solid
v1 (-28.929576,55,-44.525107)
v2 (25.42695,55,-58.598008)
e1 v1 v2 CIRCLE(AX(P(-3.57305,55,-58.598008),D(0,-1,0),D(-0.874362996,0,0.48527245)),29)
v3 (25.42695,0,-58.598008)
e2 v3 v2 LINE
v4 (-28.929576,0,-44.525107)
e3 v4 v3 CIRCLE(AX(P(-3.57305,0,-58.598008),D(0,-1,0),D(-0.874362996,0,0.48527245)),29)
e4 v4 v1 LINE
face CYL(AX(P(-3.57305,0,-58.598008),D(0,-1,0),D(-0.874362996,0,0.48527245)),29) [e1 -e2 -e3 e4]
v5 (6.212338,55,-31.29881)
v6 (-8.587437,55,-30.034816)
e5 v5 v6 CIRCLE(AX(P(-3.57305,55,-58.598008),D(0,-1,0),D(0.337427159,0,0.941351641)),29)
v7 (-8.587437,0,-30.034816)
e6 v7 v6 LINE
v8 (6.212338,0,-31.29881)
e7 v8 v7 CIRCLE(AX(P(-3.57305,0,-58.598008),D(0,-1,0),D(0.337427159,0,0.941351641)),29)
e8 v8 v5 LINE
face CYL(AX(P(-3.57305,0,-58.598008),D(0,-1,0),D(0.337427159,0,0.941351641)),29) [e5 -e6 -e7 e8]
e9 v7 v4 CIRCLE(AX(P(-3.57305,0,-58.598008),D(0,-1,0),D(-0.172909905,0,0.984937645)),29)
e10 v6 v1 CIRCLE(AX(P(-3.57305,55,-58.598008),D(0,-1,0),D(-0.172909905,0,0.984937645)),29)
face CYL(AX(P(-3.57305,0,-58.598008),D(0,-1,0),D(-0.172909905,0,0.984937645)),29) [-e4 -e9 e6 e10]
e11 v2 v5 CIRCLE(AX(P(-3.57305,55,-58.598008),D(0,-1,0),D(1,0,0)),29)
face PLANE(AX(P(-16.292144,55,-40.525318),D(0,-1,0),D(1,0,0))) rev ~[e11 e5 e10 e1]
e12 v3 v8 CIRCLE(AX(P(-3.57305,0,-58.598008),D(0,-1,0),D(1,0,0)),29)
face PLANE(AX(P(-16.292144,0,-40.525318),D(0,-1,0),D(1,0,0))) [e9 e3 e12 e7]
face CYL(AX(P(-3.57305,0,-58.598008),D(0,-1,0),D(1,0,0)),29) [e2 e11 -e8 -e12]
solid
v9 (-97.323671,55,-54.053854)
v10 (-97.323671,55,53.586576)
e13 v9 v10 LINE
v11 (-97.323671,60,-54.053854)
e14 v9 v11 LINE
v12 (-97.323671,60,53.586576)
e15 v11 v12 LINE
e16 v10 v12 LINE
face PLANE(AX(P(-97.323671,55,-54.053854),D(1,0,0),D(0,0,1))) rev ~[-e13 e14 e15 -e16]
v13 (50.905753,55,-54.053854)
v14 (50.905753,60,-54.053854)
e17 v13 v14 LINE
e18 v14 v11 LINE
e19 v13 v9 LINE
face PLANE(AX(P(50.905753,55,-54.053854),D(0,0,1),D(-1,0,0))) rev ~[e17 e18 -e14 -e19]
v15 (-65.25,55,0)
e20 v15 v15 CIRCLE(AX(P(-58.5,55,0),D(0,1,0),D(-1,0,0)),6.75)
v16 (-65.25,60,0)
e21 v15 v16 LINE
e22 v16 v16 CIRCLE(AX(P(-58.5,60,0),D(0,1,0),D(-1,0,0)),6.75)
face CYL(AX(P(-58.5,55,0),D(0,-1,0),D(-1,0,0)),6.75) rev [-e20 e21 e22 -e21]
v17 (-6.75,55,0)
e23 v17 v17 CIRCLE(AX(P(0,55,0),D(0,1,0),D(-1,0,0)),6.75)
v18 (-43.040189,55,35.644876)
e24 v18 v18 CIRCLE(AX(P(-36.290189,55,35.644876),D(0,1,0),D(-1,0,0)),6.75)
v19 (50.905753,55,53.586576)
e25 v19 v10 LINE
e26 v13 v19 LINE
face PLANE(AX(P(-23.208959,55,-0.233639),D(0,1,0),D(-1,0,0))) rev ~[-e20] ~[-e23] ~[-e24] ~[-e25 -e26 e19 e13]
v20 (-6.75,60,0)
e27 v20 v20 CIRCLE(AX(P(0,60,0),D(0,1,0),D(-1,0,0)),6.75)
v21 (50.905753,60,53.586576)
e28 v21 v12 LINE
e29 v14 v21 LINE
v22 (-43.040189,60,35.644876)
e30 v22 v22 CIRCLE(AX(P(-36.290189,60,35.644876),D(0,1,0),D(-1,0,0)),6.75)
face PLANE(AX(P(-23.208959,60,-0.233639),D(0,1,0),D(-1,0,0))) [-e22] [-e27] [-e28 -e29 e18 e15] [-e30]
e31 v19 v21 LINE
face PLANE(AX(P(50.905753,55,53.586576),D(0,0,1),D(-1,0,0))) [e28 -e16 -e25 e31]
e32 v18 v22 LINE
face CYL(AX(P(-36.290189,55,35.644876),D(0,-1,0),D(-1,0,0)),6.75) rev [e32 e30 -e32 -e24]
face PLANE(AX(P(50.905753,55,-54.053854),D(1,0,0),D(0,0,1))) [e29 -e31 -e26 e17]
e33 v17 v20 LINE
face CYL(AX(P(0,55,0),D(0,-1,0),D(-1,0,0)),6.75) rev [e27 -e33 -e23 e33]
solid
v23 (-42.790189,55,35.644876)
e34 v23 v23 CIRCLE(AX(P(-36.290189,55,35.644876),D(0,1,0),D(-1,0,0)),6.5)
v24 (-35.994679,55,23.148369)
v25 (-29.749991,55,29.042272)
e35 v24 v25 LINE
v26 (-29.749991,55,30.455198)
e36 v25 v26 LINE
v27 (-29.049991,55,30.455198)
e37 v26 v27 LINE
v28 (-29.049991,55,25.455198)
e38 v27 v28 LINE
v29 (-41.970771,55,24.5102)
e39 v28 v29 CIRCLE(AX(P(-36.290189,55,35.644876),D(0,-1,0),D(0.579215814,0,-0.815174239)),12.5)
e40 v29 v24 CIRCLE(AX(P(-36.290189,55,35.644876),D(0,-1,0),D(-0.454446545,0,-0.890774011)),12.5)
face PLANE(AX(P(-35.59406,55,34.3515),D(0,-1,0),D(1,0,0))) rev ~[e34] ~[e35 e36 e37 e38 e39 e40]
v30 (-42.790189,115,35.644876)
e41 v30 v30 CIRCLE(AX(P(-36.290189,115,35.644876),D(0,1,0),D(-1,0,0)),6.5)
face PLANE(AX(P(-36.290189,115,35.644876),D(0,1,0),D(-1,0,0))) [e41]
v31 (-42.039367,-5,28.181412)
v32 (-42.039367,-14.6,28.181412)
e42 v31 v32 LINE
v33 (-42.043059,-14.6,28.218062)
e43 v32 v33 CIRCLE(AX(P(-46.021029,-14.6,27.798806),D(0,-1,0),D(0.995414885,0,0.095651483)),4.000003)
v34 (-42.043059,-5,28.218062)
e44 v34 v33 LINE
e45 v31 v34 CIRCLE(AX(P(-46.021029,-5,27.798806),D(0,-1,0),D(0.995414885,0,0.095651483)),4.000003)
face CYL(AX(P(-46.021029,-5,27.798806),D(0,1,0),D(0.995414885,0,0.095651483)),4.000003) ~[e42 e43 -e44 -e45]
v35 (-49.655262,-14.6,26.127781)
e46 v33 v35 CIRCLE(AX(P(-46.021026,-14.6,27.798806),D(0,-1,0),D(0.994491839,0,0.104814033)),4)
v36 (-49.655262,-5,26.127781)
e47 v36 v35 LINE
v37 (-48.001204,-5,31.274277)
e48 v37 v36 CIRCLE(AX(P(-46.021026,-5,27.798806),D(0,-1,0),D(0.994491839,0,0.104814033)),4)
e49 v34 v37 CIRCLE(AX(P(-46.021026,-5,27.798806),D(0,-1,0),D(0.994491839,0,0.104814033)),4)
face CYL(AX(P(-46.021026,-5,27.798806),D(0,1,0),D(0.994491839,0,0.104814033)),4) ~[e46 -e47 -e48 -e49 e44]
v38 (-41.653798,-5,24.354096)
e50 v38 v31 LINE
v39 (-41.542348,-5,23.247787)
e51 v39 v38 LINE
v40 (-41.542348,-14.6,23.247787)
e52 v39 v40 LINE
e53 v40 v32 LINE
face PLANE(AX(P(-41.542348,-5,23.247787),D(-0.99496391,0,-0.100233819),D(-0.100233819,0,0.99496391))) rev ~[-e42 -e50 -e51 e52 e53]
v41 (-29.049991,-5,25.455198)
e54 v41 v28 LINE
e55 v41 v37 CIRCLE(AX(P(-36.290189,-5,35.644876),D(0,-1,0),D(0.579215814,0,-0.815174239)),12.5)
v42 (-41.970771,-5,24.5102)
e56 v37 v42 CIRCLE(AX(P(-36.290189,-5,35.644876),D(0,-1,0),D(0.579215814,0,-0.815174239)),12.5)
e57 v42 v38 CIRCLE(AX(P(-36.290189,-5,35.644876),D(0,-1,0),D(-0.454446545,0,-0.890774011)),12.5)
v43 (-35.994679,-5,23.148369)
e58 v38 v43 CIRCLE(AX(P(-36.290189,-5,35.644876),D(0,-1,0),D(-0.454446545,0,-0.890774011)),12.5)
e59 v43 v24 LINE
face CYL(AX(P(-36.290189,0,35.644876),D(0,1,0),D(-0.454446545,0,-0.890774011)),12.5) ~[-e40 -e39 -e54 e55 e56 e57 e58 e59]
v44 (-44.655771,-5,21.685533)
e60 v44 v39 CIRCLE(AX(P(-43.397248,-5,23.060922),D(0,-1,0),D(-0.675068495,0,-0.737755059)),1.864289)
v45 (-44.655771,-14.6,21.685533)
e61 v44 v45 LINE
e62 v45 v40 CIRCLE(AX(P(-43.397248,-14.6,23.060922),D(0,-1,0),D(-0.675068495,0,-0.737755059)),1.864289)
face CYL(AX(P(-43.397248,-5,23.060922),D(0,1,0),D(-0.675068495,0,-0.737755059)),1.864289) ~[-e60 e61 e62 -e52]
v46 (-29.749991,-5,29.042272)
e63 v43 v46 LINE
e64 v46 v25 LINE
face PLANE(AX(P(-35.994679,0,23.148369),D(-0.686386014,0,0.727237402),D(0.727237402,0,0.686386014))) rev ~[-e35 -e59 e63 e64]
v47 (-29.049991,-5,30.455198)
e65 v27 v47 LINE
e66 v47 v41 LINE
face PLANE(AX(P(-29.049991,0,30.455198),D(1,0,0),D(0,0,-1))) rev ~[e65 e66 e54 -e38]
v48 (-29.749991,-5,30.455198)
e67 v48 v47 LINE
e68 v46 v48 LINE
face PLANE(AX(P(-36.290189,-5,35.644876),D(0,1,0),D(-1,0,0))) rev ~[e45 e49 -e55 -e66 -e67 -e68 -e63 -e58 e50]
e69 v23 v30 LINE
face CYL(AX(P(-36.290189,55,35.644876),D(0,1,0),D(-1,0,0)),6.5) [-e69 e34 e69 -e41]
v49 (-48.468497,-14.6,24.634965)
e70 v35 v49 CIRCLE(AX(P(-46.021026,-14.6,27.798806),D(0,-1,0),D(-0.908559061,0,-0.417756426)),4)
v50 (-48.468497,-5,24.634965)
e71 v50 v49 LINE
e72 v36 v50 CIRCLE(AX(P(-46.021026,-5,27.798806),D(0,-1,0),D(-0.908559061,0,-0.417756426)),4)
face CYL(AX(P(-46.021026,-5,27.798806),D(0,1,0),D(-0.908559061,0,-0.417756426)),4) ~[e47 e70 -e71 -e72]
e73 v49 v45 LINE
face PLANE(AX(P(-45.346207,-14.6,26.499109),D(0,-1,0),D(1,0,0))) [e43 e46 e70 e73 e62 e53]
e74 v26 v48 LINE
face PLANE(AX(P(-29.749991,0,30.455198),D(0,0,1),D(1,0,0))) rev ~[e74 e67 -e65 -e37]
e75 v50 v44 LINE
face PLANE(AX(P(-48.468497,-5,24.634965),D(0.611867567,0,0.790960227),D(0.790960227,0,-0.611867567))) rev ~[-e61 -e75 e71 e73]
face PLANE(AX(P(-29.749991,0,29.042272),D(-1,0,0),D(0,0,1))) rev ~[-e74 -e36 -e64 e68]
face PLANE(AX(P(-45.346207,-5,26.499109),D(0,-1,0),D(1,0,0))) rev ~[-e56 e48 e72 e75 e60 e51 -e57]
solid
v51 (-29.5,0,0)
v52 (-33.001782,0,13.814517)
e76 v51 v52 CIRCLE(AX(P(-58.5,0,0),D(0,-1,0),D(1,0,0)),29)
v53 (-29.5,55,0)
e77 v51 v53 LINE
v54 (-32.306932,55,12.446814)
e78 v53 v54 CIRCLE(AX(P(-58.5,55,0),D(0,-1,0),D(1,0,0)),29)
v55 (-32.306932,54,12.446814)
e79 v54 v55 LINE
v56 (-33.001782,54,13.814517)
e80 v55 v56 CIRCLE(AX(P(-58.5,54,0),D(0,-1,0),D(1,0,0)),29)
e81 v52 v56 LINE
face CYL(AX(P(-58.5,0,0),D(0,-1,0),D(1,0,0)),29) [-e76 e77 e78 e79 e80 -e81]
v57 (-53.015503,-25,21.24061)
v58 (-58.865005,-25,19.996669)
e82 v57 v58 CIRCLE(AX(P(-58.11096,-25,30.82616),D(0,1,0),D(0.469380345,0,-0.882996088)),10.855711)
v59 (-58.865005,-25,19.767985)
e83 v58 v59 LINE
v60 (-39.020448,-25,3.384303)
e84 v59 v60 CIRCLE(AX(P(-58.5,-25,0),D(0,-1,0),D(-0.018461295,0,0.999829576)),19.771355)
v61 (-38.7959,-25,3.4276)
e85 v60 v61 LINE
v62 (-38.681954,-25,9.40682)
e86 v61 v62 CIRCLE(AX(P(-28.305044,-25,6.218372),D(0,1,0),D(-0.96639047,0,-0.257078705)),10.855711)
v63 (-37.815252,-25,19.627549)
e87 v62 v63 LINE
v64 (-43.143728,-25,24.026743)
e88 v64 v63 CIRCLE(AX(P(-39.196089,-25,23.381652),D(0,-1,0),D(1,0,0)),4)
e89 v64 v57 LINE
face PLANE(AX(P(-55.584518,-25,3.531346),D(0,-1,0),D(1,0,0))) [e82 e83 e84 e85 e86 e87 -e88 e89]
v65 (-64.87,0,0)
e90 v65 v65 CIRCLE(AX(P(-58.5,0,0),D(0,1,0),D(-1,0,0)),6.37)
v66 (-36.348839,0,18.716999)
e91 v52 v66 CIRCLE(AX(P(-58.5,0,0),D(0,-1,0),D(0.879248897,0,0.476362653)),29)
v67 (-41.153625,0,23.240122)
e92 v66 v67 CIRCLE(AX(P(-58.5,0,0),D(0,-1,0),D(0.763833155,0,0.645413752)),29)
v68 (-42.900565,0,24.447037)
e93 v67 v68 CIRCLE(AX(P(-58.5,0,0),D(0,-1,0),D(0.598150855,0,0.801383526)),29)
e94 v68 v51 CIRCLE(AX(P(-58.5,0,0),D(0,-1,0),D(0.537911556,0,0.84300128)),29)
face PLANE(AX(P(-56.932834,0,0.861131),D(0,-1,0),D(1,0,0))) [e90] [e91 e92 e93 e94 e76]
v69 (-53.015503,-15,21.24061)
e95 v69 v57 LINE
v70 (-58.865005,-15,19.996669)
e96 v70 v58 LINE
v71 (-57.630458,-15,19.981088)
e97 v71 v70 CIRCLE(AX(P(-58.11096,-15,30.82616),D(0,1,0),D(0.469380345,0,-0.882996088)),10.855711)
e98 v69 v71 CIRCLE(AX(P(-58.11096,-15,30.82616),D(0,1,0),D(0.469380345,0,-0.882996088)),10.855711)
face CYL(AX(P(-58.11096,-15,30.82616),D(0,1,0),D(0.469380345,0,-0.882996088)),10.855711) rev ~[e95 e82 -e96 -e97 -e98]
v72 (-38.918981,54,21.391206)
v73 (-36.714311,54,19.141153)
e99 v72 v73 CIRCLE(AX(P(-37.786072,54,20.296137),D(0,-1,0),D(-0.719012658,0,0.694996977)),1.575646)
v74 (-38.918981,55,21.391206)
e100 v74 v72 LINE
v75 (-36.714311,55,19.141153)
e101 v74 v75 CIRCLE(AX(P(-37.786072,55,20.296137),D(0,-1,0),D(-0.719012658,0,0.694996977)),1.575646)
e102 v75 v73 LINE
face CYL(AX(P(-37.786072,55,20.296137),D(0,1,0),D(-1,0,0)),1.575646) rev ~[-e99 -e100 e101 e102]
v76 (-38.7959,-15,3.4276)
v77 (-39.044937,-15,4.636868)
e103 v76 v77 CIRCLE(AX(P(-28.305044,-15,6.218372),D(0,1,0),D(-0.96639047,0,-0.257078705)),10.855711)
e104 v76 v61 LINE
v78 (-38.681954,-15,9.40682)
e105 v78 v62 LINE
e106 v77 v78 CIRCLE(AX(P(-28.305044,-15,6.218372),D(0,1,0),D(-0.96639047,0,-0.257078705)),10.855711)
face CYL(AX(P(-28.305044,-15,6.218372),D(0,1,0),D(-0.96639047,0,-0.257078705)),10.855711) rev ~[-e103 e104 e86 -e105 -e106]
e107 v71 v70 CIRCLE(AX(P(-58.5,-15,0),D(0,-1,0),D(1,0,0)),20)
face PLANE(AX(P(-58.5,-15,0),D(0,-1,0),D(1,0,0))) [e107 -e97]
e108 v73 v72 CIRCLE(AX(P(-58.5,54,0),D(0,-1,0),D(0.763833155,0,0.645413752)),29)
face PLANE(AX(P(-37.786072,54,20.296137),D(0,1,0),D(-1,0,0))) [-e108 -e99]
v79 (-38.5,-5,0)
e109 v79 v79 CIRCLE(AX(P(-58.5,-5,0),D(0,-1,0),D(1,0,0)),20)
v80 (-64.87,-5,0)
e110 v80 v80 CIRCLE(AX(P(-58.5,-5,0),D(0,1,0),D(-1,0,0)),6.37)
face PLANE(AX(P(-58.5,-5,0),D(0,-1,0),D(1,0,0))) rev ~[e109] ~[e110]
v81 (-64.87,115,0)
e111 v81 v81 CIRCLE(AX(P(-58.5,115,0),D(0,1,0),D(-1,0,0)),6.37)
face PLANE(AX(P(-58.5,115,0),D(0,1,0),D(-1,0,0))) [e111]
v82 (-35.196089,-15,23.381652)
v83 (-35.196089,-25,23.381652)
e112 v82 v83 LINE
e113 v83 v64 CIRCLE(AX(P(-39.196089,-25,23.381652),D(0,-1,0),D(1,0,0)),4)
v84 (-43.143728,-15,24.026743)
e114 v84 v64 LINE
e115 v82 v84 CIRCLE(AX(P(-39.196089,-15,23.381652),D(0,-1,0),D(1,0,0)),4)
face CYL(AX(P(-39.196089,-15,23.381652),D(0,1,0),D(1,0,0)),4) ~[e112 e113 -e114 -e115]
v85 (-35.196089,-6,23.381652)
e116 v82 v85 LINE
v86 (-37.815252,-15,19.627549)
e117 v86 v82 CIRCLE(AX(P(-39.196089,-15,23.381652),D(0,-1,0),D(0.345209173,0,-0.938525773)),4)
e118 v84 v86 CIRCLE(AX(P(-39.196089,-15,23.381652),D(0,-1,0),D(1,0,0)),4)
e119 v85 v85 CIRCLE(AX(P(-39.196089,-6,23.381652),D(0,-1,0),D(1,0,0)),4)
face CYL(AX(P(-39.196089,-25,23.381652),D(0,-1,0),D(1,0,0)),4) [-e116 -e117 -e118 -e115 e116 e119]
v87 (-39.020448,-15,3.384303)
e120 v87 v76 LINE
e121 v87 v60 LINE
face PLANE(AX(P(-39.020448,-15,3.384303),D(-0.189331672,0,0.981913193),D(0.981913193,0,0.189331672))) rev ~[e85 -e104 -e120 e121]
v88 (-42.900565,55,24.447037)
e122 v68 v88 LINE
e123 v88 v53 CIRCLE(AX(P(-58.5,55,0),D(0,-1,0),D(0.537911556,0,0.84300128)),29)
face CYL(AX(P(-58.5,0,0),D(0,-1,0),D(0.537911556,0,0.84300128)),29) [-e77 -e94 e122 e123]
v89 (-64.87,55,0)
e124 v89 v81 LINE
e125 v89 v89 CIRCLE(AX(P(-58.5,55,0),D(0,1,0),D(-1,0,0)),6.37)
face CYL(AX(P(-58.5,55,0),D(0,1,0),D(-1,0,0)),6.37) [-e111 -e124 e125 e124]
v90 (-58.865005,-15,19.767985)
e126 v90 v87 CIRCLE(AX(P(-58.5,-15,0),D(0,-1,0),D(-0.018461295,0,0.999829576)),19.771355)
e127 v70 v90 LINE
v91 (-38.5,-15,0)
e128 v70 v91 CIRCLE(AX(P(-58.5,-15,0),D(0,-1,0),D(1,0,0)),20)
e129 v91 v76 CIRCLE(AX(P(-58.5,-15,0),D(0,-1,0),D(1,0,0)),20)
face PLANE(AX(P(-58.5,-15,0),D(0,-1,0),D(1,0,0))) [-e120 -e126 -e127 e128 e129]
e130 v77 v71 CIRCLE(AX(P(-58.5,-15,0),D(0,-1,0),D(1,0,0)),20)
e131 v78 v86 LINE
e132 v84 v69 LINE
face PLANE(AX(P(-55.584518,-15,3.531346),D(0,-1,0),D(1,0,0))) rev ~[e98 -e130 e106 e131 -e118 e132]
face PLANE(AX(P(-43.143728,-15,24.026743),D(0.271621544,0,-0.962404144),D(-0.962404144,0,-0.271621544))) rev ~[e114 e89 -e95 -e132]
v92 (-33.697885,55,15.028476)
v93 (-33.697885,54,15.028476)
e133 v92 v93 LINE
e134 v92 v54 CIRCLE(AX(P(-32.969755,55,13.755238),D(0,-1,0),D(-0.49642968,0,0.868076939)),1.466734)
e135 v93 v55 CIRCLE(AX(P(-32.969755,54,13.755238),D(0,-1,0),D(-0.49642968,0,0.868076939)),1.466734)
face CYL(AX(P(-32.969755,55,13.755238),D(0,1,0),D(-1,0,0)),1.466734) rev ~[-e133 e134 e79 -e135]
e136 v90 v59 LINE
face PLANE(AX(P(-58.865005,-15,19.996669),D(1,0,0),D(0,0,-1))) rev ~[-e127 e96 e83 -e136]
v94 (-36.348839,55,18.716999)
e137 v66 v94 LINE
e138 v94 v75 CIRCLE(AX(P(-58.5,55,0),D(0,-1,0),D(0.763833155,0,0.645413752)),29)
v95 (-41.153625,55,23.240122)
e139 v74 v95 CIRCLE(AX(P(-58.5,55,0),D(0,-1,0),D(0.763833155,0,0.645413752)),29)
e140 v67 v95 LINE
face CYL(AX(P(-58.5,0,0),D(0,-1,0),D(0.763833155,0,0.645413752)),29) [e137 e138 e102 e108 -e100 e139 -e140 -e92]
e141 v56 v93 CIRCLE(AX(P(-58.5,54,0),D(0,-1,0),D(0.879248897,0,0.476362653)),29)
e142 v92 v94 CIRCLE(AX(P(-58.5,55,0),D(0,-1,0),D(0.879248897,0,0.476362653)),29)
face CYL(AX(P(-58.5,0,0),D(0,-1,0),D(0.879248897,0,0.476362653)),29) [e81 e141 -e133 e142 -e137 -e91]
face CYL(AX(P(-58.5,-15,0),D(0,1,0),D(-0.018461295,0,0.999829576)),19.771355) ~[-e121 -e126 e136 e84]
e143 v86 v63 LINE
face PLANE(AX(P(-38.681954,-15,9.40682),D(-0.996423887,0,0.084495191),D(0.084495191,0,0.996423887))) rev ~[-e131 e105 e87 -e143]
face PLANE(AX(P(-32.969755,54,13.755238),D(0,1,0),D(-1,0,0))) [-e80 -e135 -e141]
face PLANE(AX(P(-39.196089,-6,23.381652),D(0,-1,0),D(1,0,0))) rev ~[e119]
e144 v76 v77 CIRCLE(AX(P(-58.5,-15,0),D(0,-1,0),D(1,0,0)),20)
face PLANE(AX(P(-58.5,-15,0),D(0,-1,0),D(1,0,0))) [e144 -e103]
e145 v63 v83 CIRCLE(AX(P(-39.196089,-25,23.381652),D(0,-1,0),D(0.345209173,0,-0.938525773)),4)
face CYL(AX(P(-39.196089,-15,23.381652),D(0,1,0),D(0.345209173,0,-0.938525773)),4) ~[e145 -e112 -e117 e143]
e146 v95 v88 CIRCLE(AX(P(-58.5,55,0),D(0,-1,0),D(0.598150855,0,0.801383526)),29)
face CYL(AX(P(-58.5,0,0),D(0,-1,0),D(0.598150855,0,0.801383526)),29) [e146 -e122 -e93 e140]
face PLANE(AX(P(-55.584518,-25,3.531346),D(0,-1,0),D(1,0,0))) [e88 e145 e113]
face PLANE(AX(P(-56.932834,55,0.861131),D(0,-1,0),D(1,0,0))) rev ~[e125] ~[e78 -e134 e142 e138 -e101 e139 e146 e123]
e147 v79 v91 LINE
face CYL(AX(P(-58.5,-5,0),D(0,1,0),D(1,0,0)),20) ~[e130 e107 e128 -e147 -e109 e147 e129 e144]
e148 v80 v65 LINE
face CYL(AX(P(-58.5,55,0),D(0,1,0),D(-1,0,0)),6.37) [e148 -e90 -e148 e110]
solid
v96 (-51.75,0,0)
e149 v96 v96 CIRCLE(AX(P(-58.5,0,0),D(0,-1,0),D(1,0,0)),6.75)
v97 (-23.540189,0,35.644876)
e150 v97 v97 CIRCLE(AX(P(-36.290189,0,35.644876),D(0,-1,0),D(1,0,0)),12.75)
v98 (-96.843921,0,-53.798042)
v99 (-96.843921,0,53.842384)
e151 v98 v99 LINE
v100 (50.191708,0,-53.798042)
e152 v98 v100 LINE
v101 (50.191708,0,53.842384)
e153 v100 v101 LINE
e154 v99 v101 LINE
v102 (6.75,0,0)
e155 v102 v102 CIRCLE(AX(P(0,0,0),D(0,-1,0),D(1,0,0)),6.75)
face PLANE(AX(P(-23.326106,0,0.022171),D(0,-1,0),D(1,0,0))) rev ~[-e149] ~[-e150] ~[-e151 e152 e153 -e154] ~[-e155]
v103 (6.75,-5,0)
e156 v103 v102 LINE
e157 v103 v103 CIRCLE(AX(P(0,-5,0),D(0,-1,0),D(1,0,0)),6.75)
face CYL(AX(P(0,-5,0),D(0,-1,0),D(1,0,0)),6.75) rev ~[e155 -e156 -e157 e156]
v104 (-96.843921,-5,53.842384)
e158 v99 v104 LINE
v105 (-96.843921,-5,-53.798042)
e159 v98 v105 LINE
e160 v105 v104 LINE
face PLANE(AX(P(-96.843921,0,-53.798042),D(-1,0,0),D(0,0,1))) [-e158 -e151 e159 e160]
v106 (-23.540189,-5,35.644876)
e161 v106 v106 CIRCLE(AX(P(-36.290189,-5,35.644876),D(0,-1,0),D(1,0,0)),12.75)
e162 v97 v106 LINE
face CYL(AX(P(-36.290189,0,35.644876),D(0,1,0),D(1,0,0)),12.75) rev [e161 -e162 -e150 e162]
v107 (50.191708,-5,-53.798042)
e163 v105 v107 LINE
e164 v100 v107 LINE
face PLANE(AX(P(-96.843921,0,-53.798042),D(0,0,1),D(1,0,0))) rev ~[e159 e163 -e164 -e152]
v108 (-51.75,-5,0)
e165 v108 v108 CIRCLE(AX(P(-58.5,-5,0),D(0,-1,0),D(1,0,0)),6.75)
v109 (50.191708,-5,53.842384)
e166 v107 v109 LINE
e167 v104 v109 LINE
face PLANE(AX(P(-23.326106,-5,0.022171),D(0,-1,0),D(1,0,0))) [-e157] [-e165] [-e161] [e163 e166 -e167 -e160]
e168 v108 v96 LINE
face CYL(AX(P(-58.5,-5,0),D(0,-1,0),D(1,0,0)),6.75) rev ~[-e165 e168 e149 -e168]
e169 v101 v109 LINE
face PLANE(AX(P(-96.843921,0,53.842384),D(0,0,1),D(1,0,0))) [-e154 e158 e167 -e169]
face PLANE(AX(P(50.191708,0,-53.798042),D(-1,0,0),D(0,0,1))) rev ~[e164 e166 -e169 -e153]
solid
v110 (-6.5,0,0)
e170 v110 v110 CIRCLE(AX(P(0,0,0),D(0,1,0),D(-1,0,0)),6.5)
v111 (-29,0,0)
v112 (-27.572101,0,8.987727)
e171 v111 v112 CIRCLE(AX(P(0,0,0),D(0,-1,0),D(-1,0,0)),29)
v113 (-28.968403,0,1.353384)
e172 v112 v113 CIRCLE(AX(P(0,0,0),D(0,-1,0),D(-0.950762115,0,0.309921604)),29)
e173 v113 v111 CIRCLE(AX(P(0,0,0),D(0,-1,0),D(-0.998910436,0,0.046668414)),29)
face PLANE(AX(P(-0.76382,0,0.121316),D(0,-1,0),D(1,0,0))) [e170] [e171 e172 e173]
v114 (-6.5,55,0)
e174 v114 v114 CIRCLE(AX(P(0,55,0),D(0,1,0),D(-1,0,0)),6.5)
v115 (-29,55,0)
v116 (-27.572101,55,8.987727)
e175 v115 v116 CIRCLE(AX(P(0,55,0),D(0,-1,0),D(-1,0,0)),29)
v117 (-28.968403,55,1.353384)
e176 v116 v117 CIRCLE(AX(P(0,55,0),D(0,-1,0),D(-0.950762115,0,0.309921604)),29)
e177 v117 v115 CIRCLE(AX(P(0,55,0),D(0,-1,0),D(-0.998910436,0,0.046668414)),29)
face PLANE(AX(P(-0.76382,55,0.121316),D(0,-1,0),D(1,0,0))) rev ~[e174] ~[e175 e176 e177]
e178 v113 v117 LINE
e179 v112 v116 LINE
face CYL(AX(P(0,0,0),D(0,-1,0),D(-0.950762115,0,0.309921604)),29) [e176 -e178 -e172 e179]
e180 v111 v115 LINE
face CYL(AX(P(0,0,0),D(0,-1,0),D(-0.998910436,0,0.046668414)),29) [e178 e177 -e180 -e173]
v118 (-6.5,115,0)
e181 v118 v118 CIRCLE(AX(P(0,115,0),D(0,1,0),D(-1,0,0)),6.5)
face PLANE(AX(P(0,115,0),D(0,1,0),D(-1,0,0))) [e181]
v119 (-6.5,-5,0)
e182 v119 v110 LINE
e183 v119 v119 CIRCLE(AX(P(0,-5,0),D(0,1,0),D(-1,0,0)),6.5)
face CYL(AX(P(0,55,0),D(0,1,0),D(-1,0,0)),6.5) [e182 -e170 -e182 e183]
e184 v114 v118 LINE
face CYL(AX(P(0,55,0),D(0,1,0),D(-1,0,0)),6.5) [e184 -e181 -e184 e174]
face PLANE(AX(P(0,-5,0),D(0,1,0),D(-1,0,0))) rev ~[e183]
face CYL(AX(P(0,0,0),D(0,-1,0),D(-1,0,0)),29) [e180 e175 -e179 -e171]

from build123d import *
from build123d import SkipClean  # not in build123d's __all__

# Parameters (mm, degrees)
F1_DEPTH  = 55
F2_DEPTH  = 55
F3_DEPTH  = 5
F4_W      = 147.0356285572
F4_H      = 107.6404266059
F4_R      = 12.75
F5_DEPTH  = 5
F6_R      = 6.5
F7_DEPTH  = 60
F6_R_2    = 6.37
F8_R      = 6.75
F8_R_2    = 6.5
F9_DEPTH  = 5
F10_W     = 148.2294239104
F10_H     = 107.6404303312
F10_R     = 29
F10_R_2   = 6.75
F11_DEPTH = 5
F12_R     = 20
F13_DEPTH = 10
F15_DEPTH = 9.6
F16_R     = 1.4667338037
F16_R_2   = 1.575645526
F17_DEPTH = 1
F19_DEPTH = 10
F20_R     = 4
F21_DEPTH = 19


# Not quite as in the source:
# - a feature names something its author has since deleted; it is built from what else it names


with BuildPart() as f1:
    # F0 (on Front) → F1 (new body)
    with BuildSketch(Plane.XZ):
        with BuildLine():
            ThreePointArc((-41.1536252148, 23.2401222417), (-42.0160454202, 23.8595733703), (-42.9005648719, 24.4470371146))
            ThreePointArc((-42.9005648719, 24.4470371146), (-83.9301358502, -13.9394472861), (-29.5, 0))
            ThreePointArc((-29.5, 0), (-30.3890739875, 7.1257167163), (-33.0017819808, 13.8145169241))
            ThreePointArc((-33.0017819808, 13.8145169241), (-34.5495422962, 16.3516230319), (-36.348838503, 18.7169988068))
            ThreePointArc((-36.348838503, 18.7169988068), (-38.6221604672, 21.1156694307), (-41.1536252148, 23.2401222417))
        make_face()
    extrude(amount=-F1_DEPTH)

    # F6 (on face) → F7, piece 2 (join, symmetric)
    with BuildSketch(Plane(origin=(0, 55, 0), x_dir=(-1, 0, 0), z_dir=(0, 1, 0))):
        with Locations((58.5, 0)):
            Circle(F6_R_2)
    extrude(amount=F7_DEPTH, both=True)

    # F12 (on face) → F13 (join)
    with BuildSketch(Plane.XZ.offset(5)):
        with Locations((-58.5, 0)):
            Circle(F12_R)
    extrude(amount=F13_DEPTH)

    # F16 (on face) → F17 (cut)
    with BuildSketch(Plane(origin=(0, 55, 0), x_dir=(-1, 0, 0), z_dir=(0, 1, 0))):
        with Locations((32.9697545245, 13.7552377646)):
            Circle(F16_R)
        with Locations((37.7860717411, 20.2961369745)):
            Circle(F16_R_2)
    extrude(amount=-F17_DEPTH, mode=Mode.SUBTRACT)

    # F18 (on face) → F19 (join)
    with BuildSketch(Plane.XZ.offset(15)):
        with BuildLine():
            Line((-58.8650048174, 19.9966690097), (-58.8650048174, 19.7679851447))
            ThreePointArc((-58.8650048174, 19.7679851447), (-71.0876028348, -15.2465969997), (-39.0204476237, 3.3843026488))
            Line((-39.0204476237, 3.3843026488), (-38.7958999198, 3.4275997474))
            ThreePointArc((-38.7958999198, 3.4275997474), (-39.158784575, 6.4252112319), (-38.6819540845, 9.4068202888))
            Line((-38.6819540845, 9.4068202888), (-37.8152522193, 19.6275492174))
            ThreePointArc((-37.8152522193, 19.6275492174), (-41.7427232808, 20.2970691325), (-43.1437283838, 24.0267434556))
            Line((-43.1437283838, 24.0267434556), (-53.0155028424, 21.2406097555))
            ThreePointArc((-53.0155028424, 21.2406097555), (-55.852904996, 20.207890576), (-58.8650048174, 19.9966690097))
        make_face()
        with BuildLine():
            ThreePointArc((-35.1960889101, 23.3816523105), (-38.8724825867, 27.3685406896), (-43.1437283838, 24.0267434556))
            ThreePointArc((-43.1437283838, 24.0267434556), (-41.7427232808, 20.2970691325), (-37.8152522193, 19.6275492174))
            ThreePointArc((-37.8152522193, 19.6275492174), (-35.915589957, 21.0929132213), (-35.1960889101, 23.3816523105))
        make_face()
    extrude(amount=F19_DEPTH)

    # F20 (on face) → F21 (join)
    with BuildSketch(Plane.XZ.offset(25)):
        with Locations((-39.1960889101, 23.3816523105)):
            Circle(F20_R)
    with SkipClean():  # cleaning this boolean's faces spoils the solid; the shape is the same uncleaned
        extrude(amount=-F21_DEPTH)


with BuildPart() as f1b:
    # F0 (on Front) → F1, piece 2 (new body)
    with BuildSketch(Plane.XZ):
        with BuildLine():
            ThreePointArc((-28.9684026443, 1.3533839956), (-28.9920995849, 0.676876398), (-29, 0))
            ThreePointArc((-29, 0), (28.6408007806, -4.5502231426), (-27.5721013347, 8.9877265196))
            ThreePointArc((-27.5721013347, 8.9877265196), (-28.5267934404, 5.217476019), (-28.9684026443, 1.3533839956))
        make_face()
    extrude(amount=-F1_DEPTH)

    # F6 (on face) → F7 (join, symmetric)
    with BuildSketch(Plane(origin=(0, 55, 0), x_dir=(-1, 0, 0), z_dir=(0, 1, 0))):
        Circle(F6_R)
    extrude(amount=F7_DEPTH, both=True)


with BuildPart() as f1c:
    # F0 (on Front) → F1, piece 3 (new body)
    with BuildSketch(Plane.XZ):
        with BuildLine():
            ThreePointArc((-8.5874367907, -30.0348162964), (-6.6181195056, -33.6613095975), (-5.9369329363, -37.7314016223))
            ThreePointArc((-5.9369329363, -37.7314016223), (-14.8949027207, -49.7190628601), (-28.9295764486, -44.5251069533))
            ThreePointArc((-28.9295764486, -44.5251069533), (-10.8414991929, -86.6723671252), (25.4269504417, -58.5980080068))
            ThreePointArc((25.4269504417, -58.5980080068), (20.1416741432, -41.9063370372), (6.2123380445, -31.2988104094))
            ThreePointArc((6.2123380445, -31.2988104094), (-1.1052506579, -29.703199328), (-8.5874367907, -30.0348162964))
        make_face()
    extrude(amount=-F1_DEPTH)

    # F0 (on Front) → F2, piece 2 (join)
    with BuildSketch(Plane.XZ):
        with BuildLine():
            ThreePointArc((-28.9295764486, -44.5251069533), (-14.8949027207, -49.7190628601), (-5.9369329363, -37.7314016223))
            ThreePointArc((-5.9369329363, -37.7314016223), (-6.6181195056, -33.6613095975), (-8.5874367907, -30.0348162964))
            ThreePointArc((-8.5874367907, -30.0348162964), (-20.398335202, -34.9778944802), (-28.9295764486, -44.5251069533))
        make_face()
    extrude(amount=-F2_DEPTH)


with BuildPart() as f2:
    # F0 (on Front) → F2 (new body)
    with BuildSketch(Plane.XZ):
        with BuildLine():
            Line((-29.7499911844, 29.0422718972), (-29.7499911844, 30.4551975319))
            Line((-29.7499911844, 30.4551975319), (-29.0499911844, 30.4551975319))
            Line((-29.0499911844, 30.4551975319), (-29.0499911844, 28.7470832982))
            Line((-29.0499911844, 28.7470832982), (-29.0499911844, 25.4551975319))
            ThreePointArc((-29.0499911844, 25.4551975319), (-37.2019757379, 48.111576961), (-41.9707706725, 24.5102003937))
            ThreePointArc((-41.9707706725, 24.5102003937), (-39.0674891647, 23.4573161705), (-35.9946793142, 23.148369049))
            Line((-35.9946793142, 23.148369049), (-29.7499911844, 29.0422718972))
        make_face()
    extrude(amount=-F2_DEPTH)

    # F3 (add): a face of the model
    f3_faces = [f2.faces().sort_by_distance(p)[0] for p in [
        (-36.4766460991, 0, 36.0174252396),
    ]]
    extrude(f3_faces, amount=F3_DEPTH)

    # F6 (on face) → F7, piece 3 (join, symmetric)
    with BuildSketch(Plane(origin=(0, 55, 0), x_dir=(-1, 0, 0), z_dir=(0, 1, 0))):
        with Locations((36.2901888608, 35.6448755251)):
            Circle(F6_R)
    extrude(amount=F7_DEPTH, both=True)

    # F14 (on face) → F15 (join)
    with BuildSketch(Plane.XZ.offset(5)):
        with BuildLine():
            Line((-41.5423475849, 23.2477869574), (-42.039366708, 28.1814121262))
            ThreePointArc((-42.039366708, 28.1814121262), (-42.0411706118, 28.1997414844), (-42.0430588933, 28.2180623422))
            ThreePointArc((-42.0430588933, 28.2180623422), (-47.0802039077, 31.6560257646), (-49.6552624965, 26.1277805045))
            ThreePointArc((-49.6552624965, 26.1277805045), (-49.1521463113, 25.3096121307), (-48.4684965177, 24.6349653021))
            Line((-48.4684965177, 24.6349653021), (-44.6557707015, 21.6855334745))
            ThreePointArc((-44.6557707015, 21.6855334745), (-42.5611405388, 21.3946394228), (-41.5423475849, 23.2477869574))
        make_face()
    extrude(amount=F15_DEPTH)


with BuildPart() as f5:
    # F4 (on face) → F5 (new body)
    with BuildSketch(Plane.XZ):
        with Locations((-23.3261063695, 0.0221710652)):
            Rectangle(F4_W, F4_H)
        with Locations((-36.2901888608, 35.6448755251)):
            Circle(F4_R, mode=Mode.SUBTRACT)
    extrude(amount=F5_DEPTH)

    # F8 (on face) → F9 (cut)
    with BuildSketch(Plane.XZ.offset(5)):
        Circle(F8_R)
        with Locations((-58.5, 0)):
            Circle(F8_R)
        with Locations((-36.2901888608, 35.6448755251)):
            Circle(F8_R_2)
    extrude(amount=-F9_DEPTH, mode=Mode.SUBTRACT)


with BuildPart() as f11:
    # F10 (on face) → F11 (new body)
    with BuildSketch(Plane(origin=(0, 55, 0), x_dir=(-1, 0, 0), z_dir=(0, 1, 0))):
        with Locations((23.2089590281, -0.2336390316)):
            Rectangle(F10_W, F10_H)
        Circle(F10_R, mode=Mode.SUBTRACT)
        with Locations((58.5, 0)):
            Circle(F10_R_2, mode=Mode.SUBTRACT)
        with Locations((36.2901888608, 35.6448755251)):
            Circle(F10_R_2, mode=Mode.SUBTRACT)
        Circle(F10_R)
        Circle(F10_R_2, mode=Mode.SUBTRACT)
    extrude(amount=F11_DEPTH)


solid = Compound([f1.part, f1b.part, f1c.part, f2.part, f5.part, f11.part])
